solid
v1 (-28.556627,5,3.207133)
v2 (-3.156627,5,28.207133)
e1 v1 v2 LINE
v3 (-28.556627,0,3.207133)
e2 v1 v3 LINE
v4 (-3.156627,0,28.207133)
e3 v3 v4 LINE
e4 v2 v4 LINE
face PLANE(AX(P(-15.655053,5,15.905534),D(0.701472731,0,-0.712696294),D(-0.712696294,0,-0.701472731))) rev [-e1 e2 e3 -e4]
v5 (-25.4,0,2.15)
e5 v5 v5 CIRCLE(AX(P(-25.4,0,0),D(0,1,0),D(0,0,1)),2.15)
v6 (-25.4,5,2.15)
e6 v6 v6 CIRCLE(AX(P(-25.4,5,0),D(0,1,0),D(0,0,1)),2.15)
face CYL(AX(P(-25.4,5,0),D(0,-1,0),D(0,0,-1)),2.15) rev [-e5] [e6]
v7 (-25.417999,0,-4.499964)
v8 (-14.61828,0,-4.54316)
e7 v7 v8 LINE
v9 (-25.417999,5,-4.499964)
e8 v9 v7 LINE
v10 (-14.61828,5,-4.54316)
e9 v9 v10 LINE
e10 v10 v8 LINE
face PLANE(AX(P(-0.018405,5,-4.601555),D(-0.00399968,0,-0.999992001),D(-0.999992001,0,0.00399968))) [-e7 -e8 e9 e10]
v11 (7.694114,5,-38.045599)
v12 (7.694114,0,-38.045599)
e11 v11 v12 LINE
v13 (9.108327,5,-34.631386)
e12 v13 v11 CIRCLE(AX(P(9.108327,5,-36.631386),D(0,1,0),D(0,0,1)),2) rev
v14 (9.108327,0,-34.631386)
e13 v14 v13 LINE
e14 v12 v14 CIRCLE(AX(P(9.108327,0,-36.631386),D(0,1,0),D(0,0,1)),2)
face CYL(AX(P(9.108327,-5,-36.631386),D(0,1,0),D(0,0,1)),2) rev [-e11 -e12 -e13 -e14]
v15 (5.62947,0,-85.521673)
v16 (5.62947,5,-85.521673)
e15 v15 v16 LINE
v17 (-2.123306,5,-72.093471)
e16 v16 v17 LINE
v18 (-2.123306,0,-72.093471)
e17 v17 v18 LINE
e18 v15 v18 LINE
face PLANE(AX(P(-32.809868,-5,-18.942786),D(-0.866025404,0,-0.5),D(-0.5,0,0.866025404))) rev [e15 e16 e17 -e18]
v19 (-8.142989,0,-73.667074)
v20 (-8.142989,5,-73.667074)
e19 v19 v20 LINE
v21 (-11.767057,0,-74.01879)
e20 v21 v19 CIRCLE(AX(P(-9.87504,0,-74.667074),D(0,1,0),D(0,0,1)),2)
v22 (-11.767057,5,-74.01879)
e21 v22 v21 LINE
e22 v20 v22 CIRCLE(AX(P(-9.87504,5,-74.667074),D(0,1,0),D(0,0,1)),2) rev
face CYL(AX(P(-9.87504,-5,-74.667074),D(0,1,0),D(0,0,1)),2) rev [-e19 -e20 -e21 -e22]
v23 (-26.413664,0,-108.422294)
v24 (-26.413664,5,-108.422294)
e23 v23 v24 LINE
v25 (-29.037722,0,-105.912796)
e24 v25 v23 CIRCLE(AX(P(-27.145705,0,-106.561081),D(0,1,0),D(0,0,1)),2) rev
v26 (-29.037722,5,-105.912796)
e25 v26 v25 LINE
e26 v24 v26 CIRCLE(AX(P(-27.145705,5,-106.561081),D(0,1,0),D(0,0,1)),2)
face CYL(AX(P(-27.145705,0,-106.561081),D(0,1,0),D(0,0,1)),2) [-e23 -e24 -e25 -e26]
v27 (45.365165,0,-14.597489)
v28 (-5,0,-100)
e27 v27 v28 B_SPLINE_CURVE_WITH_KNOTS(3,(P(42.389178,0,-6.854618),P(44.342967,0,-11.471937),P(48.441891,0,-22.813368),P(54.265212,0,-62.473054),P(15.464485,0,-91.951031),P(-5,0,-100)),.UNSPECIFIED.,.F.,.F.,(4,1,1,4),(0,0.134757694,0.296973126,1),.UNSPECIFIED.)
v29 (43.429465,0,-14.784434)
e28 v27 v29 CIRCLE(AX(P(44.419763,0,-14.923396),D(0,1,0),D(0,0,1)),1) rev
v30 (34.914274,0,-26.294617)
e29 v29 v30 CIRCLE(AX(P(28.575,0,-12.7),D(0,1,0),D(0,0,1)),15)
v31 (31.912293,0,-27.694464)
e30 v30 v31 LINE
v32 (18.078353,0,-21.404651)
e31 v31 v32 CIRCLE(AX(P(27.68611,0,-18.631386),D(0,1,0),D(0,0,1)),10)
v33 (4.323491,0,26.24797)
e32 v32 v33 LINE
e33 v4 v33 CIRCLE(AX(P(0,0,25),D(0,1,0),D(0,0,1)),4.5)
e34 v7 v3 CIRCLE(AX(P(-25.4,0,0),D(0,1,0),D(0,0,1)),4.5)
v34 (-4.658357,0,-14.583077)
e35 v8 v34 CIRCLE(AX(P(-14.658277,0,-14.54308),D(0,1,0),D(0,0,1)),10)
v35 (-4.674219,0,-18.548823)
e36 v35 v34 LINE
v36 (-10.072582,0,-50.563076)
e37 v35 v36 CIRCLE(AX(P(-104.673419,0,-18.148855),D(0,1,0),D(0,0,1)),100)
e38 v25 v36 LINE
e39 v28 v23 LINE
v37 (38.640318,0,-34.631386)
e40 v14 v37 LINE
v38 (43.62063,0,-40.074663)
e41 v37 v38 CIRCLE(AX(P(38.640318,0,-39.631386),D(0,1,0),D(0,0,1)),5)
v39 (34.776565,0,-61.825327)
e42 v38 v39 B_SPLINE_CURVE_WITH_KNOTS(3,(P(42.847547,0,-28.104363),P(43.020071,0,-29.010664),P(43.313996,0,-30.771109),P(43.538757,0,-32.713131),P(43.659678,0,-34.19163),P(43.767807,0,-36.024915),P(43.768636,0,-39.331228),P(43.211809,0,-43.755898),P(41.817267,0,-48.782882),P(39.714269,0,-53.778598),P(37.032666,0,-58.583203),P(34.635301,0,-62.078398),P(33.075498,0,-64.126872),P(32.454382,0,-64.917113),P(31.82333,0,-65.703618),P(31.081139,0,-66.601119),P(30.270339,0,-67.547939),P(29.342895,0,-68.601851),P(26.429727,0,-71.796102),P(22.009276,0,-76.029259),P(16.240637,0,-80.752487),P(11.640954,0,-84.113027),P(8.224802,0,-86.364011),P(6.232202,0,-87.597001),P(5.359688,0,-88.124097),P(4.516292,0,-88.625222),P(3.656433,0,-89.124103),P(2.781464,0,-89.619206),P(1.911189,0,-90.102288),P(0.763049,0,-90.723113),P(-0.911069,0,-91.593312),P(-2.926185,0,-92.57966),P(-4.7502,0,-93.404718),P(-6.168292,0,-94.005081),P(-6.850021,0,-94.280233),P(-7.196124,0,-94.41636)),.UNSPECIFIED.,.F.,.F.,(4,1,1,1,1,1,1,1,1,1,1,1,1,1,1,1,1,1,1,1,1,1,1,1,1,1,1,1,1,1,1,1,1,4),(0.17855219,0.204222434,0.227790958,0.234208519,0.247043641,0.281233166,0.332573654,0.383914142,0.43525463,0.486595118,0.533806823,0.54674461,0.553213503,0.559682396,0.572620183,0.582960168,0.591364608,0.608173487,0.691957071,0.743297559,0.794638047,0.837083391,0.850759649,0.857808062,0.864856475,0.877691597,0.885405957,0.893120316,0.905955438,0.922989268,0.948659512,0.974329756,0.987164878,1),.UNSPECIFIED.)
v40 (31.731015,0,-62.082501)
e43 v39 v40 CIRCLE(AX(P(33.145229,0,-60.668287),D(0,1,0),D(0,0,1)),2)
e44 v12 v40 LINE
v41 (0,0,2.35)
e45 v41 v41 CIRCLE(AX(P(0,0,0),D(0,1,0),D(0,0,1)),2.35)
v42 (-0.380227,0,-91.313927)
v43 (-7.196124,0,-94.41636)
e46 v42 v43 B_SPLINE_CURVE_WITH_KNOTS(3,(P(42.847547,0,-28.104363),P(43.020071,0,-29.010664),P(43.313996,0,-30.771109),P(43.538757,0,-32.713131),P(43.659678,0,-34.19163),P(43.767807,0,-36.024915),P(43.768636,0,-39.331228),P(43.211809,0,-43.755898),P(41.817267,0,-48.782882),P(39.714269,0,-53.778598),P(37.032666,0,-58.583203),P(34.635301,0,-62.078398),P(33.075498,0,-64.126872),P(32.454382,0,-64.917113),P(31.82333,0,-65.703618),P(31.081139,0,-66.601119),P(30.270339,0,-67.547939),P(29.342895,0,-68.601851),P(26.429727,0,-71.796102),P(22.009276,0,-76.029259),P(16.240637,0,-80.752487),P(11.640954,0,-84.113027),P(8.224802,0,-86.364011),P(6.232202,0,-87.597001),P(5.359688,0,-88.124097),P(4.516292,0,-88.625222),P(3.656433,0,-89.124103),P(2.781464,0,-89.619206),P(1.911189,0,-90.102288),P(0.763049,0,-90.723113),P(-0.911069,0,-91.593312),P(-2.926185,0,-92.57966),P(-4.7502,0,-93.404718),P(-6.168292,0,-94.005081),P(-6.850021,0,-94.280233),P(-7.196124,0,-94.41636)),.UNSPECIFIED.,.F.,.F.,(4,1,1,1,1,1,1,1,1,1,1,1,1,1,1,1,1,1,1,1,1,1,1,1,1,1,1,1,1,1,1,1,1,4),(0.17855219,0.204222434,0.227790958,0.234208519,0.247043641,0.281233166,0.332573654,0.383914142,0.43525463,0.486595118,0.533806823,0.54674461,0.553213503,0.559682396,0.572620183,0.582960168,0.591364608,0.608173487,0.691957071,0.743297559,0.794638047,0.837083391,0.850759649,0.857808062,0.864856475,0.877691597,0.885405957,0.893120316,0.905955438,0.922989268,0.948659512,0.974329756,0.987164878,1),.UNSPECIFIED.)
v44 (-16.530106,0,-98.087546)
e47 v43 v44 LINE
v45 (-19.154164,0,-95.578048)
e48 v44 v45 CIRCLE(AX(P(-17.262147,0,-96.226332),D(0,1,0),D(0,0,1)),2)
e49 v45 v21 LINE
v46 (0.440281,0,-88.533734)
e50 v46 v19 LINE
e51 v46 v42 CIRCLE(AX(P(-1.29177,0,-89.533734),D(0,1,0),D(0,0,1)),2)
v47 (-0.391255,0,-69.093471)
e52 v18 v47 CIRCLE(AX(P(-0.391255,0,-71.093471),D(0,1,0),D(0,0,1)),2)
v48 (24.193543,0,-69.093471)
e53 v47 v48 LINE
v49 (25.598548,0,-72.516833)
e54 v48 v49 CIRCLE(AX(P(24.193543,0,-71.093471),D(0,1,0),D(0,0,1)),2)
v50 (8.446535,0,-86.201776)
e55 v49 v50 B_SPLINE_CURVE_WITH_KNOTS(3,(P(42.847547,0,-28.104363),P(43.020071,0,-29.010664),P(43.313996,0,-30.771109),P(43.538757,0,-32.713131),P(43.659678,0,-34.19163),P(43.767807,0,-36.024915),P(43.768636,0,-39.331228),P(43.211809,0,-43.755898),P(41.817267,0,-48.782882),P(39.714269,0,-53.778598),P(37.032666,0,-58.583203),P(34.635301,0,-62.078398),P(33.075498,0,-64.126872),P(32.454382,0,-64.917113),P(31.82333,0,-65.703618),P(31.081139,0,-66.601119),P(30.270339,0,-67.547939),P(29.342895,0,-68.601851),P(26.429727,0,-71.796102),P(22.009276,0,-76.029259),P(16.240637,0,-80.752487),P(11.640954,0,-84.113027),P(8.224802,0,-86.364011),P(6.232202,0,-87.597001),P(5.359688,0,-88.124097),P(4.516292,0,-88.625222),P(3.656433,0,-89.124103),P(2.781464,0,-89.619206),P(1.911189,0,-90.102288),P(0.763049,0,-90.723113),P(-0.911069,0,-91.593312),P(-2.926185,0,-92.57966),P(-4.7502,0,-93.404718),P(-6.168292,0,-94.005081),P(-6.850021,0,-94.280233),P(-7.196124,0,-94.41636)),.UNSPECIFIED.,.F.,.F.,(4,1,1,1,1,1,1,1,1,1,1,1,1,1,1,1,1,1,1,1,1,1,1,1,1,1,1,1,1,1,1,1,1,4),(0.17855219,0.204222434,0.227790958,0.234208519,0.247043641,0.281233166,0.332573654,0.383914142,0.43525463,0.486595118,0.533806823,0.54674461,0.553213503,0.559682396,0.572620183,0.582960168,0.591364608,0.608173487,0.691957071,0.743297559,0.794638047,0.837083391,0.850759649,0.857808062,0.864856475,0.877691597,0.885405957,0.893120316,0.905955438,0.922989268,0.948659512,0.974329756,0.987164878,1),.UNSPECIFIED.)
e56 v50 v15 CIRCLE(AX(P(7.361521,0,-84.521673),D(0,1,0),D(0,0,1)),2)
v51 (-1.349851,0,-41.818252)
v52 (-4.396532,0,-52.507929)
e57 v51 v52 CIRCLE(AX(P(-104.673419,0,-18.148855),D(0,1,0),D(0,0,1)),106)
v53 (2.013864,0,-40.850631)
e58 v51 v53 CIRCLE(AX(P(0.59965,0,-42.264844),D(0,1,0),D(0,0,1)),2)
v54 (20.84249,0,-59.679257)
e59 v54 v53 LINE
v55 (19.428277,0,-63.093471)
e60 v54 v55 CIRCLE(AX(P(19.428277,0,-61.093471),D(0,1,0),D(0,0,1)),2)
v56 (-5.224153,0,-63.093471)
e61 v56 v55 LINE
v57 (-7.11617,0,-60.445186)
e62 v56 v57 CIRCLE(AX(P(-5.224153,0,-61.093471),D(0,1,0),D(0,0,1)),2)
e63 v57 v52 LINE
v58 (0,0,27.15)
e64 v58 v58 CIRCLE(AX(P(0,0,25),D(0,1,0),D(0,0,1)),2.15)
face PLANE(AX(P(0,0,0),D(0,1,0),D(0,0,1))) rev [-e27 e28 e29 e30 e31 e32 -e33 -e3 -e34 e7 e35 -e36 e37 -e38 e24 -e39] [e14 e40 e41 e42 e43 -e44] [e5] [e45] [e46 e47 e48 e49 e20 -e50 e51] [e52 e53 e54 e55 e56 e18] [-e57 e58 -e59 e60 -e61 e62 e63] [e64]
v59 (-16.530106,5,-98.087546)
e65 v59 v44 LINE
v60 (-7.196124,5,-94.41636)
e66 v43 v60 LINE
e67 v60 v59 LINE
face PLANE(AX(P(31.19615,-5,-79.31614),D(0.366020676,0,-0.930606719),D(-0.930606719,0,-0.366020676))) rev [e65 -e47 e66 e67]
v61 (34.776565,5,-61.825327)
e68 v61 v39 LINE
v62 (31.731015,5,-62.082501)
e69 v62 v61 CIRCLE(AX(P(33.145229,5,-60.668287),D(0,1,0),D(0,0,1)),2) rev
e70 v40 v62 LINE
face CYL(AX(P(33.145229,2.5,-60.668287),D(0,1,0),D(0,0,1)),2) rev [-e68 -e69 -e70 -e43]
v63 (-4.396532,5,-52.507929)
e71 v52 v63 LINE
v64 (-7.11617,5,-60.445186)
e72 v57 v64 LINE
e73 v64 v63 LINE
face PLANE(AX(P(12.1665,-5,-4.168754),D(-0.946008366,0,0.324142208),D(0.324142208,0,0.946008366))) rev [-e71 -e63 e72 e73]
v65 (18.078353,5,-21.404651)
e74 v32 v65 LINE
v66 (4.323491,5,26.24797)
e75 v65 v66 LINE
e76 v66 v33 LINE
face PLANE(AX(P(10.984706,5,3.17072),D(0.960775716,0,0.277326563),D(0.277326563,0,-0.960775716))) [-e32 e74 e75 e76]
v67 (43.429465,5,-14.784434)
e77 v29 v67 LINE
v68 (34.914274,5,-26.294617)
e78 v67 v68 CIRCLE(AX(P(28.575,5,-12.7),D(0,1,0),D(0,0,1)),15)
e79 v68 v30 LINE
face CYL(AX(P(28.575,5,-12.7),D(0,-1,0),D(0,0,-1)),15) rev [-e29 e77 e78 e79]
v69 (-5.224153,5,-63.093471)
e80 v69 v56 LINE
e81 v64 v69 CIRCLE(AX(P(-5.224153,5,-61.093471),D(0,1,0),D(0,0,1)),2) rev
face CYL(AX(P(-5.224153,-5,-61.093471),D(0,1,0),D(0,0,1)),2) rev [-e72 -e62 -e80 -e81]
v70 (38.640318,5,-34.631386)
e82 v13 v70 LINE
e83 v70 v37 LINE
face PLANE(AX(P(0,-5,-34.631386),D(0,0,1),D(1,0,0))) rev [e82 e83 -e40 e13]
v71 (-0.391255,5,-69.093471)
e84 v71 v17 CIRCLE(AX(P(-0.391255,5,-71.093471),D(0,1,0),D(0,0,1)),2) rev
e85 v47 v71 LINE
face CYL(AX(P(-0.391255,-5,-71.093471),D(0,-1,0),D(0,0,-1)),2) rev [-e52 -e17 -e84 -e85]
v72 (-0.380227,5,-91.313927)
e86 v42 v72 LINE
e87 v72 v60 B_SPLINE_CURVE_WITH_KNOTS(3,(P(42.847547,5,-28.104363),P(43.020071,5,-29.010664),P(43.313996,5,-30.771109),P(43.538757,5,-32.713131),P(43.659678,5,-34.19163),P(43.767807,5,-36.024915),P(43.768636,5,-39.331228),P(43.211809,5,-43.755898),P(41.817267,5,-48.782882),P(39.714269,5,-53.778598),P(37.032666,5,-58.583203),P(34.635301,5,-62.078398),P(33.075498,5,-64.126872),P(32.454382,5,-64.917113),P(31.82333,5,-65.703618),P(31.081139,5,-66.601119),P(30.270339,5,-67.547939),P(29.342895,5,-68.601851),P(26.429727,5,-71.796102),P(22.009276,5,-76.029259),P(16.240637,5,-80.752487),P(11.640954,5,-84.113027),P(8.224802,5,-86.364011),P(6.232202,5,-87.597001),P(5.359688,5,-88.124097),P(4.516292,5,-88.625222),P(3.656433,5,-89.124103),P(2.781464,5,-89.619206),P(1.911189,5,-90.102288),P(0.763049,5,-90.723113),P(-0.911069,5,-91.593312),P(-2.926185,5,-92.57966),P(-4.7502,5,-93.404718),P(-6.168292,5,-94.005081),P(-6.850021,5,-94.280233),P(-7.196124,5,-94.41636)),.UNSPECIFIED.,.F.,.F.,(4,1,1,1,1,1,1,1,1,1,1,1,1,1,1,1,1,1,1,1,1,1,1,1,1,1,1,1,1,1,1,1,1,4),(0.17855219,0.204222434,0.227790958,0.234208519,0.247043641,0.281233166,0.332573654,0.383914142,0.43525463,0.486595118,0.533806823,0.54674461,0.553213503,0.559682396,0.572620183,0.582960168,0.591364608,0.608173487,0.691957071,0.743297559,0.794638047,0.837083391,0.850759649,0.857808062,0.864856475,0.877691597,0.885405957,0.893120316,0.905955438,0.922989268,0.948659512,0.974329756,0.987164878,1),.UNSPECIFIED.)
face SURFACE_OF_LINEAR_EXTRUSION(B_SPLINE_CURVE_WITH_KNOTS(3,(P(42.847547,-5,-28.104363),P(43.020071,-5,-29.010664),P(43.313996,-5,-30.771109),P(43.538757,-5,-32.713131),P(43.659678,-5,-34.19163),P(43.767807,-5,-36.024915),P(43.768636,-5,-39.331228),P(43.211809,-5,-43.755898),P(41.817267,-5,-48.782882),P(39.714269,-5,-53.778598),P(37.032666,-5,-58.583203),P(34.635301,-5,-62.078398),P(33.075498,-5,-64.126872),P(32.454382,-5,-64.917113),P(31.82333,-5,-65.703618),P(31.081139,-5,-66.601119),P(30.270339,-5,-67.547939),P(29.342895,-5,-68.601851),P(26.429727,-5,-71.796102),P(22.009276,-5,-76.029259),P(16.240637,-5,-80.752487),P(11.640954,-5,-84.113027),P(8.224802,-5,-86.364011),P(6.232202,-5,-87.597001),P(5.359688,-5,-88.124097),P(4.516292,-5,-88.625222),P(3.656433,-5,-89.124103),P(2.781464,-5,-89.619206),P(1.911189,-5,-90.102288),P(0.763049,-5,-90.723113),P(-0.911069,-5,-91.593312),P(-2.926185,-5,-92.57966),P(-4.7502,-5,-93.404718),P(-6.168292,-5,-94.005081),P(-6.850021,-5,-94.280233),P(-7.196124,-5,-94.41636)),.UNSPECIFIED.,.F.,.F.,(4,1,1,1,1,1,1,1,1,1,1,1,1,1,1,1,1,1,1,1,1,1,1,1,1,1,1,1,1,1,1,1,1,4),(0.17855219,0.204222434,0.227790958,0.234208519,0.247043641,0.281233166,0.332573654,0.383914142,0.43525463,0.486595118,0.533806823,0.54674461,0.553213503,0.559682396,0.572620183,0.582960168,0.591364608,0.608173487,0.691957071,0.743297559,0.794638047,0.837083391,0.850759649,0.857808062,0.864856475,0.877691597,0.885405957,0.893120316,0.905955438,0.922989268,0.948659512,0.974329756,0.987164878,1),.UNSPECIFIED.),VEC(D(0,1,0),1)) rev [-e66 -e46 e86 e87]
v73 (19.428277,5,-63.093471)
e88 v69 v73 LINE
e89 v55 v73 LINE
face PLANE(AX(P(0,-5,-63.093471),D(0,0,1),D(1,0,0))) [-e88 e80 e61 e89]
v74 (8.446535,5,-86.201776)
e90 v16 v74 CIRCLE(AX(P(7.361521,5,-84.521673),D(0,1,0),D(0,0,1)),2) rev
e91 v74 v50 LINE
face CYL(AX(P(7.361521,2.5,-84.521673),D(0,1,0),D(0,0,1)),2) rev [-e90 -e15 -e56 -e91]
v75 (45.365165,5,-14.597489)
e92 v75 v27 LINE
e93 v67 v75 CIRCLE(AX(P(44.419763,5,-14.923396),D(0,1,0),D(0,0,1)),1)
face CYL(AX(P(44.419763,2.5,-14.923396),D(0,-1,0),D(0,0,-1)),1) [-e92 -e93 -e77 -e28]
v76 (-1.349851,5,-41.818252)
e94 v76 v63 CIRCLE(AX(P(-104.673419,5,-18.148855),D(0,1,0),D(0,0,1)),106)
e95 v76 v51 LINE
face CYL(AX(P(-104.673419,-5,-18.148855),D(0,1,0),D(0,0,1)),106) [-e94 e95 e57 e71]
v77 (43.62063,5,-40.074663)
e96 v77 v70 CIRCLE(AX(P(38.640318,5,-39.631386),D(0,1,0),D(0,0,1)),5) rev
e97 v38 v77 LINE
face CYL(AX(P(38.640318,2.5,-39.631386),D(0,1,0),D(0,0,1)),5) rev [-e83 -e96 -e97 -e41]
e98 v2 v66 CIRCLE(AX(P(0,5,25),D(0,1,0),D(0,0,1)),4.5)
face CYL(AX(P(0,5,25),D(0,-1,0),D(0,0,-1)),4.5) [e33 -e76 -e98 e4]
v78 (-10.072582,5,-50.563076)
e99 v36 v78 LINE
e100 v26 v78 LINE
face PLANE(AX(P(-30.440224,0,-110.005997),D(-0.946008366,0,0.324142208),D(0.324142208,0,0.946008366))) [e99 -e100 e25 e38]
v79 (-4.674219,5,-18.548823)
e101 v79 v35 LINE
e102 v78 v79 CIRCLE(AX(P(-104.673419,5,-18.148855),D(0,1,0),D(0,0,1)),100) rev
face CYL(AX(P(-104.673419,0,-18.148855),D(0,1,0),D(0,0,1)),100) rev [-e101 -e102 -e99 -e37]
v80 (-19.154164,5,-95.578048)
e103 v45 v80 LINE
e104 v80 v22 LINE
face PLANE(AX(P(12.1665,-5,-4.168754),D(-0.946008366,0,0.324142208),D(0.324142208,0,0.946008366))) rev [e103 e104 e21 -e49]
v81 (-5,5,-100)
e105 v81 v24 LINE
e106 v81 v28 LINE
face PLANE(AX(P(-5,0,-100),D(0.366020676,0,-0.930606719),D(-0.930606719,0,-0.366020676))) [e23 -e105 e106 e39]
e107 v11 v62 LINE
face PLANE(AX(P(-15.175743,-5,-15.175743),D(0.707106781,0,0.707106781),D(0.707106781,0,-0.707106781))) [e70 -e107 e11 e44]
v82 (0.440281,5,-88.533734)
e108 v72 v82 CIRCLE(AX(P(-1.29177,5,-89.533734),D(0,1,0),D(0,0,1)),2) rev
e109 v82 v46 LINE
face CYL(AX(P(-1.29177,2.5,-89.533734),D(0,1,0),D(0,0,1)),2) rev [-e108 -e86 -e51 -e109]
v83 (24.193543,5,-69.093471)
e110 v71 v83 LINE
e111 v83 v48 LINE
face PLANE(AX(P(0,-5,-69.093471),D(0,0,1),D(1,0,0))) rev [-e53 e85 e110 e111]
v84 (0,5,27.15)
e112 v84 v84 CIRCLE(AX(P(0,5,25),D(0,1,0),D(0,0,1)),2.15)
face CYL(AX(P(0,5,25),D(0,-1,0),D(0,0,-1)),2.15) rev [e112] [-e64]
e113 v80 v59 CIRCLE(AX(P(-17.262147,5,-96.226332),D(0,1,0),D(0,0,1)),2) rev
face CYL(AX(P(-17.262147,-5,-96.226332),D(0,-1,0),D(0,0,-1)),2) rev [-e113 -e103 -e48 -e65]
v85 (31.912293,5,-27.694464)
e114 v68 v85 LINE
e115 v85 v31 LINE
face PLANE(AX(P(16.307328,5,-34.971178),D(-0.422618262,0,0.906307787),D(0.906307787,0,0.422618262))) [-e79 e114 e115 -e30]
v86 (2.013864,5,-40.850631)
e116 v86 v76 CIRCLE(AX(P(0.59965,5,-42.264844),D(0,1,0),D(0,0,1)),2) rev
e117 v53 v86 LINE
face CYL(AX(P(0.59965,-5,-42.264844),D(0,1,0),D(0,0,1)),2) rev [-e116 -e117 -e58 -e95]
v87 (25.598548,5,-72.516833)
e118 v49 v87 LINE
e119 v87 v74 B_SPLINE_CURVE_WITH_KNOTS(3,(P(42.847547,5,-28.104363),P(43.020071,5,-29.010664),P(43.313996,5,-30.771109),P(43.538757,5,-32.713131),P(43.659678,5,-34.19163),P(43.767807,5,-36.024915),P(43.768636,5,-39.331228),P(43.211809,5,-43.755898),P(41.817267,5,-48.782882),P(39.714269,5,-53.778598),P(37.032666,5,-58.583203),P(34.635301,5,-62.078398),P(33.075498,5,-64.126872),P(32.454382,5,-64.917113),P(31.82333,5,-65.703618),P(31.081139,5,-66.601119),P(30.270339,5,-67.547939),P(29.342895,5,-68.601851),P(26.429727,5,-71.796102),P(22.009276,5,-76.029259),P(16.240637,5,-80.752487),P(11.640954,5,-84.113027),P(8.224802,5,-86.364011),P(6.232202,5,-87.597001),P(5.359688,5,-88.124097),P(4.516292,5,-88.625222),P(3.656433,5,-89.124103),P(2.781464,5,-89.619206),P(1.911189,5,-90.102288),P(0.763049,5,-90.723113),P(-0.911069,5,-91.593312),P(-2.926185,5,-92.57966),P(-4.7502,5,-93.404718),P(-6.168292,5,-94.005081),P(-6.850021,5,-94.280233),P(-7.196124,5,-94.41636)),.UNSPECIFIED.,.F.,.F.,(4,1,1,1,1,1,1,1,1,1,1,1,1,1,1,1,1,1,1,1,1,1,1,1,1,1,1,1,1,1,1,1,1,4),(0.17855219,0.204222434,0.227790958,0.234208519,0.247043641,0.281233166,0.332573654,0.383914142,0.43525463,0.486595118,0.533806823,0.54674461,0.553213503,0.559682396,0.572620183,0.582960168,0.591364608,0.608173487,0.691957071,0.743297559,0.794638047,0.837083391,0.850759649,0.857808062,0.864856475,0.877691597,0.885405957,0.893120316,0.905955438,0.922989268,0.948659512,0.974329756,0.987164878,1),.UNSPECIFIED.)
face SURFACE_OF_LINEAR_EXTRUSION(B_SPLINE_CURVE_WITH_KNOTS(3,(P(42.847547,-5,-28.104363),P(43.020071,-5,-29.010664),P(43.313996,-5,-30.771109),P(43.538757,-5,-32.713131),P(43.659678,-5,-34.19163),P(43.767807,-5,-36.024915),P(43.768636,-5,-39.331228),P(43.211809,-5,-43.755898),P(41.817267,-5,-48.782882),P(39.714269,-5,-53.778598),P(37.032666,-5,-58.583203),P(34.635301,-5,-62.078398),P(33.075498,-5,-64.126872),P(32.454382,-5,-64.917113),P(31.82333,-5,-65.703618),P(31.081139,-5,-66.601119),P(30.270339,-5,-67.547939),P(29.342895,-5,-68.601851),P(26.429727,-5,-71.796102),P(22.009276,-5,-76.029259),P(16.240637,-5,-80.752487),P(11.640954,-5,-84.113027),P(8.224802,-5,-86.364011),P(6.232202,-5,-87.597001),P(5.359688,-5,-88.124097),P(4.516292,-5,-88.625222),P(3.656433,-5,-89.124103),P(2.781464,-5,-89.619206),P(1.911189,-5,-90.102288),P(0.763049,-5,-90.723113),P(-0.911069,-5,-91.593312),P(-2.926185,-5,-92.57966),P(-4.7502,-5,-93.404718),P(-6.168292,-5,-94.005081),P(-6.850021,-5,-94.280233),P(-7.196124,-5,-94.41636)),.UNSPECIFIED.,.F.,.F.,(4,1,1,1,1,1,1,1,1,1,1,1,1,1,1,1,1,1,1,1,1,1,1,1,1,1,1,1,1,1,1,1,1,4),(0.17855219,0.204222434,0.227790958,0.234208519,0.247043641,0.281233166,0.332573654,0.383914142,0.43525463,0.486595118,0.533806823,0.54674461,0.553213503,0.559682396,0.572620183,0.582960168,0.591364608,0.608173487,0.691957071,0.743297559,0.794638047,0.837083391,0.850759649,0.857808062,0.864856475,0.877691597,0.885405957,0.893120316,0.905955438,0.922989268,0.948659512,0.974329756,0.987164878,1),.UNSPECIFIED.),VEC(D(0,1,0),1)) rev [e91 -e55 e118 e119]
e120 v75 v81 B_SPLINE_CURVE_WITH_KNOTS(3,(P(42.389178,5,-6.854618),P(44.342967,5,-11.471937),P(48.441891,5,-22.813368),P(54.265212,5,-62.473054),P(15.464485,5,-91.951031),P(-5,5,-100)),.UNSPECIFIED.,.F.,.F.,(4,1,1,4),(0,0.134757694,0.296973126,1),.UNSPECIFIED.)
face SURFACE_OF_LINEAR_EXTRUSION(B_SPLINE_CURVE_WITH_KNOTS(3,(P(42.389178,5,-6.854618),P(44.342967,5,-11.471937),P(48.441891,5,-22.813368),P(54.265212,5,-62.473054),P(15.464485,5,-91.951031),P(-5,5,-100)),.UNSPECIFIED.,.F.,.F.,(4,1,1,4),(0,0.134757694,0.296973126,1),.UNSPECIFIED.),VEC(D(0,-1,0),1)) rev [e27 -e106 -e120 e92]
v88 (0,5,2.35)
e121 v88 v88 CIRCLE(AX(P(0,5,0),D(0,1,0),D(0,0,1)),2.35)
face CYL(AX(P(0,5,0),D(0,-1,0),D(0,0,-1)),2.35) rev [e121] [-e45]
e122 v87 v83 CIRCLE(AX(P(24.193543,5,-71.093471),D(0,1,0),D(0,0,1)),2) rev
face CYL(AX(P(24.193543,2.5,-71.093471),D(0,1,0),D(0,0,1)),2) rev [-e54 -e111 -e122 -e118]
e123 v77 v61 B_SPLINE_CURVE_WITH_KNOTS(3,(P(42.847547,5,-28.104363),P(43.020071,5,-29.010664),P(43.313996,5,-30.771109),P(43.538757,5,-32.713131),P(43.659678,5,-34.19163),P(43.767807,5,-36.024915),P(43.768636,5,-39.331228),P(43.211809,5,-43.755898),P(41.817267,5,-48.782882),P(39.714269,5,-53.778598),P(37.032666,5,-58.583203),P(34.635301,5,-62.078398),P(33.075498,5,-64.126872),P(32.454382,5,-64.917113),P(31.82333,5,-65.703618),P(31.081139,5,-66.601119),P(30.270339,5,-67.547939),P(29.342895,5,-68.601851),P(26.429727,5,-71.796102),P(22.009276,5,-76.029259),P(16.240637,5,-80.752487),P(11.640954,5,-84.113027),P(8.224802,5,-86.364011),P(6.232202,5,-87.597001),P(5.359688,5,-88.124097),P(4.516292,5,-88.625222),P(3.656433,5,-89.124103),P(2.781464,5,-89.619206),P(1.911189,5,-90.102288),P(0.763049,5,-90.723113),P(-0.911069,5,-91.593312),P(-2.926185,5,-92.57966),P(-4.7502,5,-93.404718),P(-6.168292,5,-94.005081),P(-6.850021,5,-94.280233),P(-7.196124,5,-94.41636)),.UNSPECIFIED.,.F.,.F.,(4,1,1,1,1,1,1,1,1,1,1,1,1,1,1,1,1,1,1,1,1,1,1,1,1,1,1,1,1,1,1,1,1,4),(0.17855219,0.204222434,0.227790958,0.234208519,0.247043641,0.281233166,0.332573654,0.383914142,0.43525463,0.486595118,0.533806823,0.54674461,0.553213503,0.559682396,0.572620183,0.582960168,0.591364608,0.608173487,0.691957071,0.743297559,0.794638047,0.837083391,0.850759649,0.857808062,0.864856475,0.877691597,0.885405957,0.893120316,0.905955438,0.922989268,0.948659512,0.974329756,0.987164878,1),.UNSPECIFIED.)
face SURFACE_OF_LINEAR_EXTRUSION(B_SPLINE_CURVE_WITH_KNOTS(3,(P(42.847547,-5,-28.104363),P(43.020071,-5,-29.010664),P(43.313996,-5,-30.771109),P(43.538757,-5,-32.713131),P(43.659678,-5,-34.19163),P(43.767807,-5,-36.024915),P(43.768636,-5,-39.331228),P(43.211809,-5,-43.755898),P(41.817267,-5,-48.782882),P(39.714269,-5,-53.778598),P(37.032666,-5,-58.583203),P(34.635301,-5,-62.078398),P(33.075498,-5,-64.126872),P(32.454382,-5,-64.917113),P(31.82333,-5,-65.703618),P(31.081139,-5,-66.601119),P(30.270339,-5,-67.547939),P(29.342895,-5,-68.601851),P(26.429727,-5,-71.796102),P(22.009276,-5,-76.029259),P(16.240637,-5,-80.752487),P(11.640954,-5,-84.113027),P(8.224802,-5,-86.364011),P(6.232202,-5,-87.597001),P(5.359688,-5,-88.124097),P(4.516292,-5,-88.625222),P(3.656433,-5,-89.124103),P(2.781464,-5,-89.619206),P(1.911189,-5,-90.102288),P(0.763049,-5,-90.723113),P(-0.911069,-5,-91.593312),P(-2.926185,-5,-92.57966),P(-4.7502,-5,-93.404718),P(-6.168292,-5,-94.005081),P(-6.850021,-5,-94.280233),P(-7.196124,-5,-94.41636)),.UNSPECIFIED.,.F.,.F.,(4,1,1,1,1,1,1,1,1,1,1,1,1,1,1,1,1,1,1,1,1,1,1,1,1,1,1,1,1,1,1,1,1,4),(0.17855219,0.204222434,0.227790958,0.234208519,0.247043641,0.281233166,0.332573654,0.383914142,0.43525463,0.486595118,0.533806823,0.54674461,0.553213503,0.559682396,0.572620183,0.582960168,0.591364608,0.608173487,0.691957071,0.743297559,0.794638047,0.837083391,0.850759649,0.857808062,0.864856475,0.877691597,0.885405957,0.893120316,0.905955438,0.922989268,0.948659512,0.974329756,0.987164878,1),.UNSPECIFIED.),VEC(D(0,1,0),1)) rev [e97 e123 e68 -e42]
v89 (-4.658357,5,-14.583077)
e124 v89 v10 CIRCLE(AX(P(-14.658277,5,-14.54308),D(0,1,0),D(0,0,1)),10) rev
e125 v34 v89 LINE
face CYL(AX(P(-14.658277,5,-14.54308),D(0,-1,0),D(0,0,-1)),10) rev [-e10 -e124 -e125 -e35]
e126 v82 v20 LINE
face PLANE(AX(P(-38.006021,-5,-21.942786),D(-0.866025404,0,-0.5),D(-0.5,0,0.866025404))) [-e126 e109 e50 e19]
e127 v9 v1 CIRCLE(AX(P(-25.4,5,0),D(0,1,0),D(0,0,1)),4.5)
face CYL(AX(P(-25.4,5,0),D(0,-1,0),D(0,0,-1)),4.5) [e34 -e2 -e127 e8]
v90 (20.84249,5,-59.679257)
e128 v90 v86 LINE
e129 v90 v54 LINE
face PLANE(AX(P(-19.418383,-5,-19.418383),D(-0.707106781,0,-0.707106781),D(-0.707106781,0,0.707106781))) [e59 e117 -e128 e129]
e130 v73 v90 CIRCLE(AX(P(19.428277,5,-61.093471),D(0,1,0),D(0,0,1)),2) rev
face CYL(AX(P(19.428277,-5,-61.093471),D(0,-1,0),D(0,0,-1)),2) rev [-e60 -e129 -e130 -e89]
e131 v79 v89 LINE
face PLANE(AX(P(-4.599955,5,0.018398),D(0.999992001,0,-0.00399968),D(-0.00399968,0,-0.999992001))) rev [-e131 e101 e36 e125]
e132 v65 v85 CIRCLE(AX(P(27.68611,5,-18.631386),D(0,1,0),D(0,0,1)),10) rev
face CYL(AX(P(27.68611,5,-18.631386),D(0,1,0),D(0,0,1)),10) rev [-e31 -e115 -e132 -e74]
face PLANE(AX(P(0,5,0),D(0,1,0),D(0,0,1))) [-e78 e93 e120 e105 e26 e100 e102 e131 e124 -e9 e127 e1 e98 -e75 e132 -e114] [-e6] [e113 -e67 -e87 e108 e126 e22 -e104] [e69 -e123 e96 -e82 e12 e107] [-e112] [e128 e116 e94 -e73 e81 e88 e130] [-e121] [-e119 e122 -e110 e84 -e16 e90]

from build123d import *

# Parameters (mm, degrees)
SKETCH1_R           = 2.35
SKETCH1_R_2         = 2.15
BOSS_EXTRUDE1_DEPTH = 5
BOSS_EXTRUDE2_DEPTH = 5
FILLET9_START       = -1
FILLET9_DEPTH       = 7
FILLET10_R          = 10
FILLET11_R          = 10
FILLET12_R          = 2
FILLET13_R          = 100
CUT_EXTRUDE1_DEPTH  = 10
FILLET16_R          = 2
FILLET17_R          = 5


with BuildPart() as part:
    # Sketch1 → Boss-Extrude1 (new body)
    # profile 1 of 5: a face of its own
    with BuildSketch(Plane(origin=(0, 0, 0), x_dir=(1, 0, 0), z_dir=(0, 1, 0))):
        with BuildLine():
            Line((21.319657121, 32.633890732), (34.914273926, 26.294616806))
            ThreePointArc((34.914273926, 26.294616806), (41.225871687, 20.759494125), (43.575, 12.7))
            ThreePointArc((43.575, 12.7), (43.275555611, 9.717775204), (42.389178035, 6.854618472))
            add(Edge.make_bspline(
                [(42.389178035, 6.854618472), (44.342966782, 11.471936513), (48.441890724, 22.813367807), (54.26521217, 62.473053577), (15.464484864, 91.951031047), (-5, 100)],
                knots=[0, 0, 0, 0, 0.134757694, 0.296973126, 1, 1, 1, 1], degree=3))
            Line((-5, 100), (-4.618360102, 4.58315657))
            Line((-4.618360102, 4.58315657), (-4.499964006, -25.01799856))
            ThreePointArc((-4.499964006, -25.01799856), (-0.008999298, -20.500008999), (4.5, -25))
            ThreePointArc((4.5, -25), (4.455654175, -25.630195106), (4.323490724, -26.247969535))
            Line((4.323490724, -26.247969535), (14.266400512, 8.198446858))
            ThreePointArc((14.266400512, 8.198446858), (14.163364253, 16.859898449), (18.866215247, 24.134137424))
            Line((18.866215247, 24.134137424), (21.319657121, 32.633890732))
        make_face()
        with Locations(Location((0, 0, 0), (0, 0, 270))):
            Circle(SKETCH1_R, mode=Mode.SUBTRACT)
    # profile 2 of 5: a face of its own
    with BuildSketch(Plane(origin=(0, 0, 0), x_dir=(1, 0, 0), z_dir=(0, 1, 0))):
        with BuildLine():
            Line((14.266400512, 8.198446858), (18.866215247, 24.134137424))
            ThreePointArc((18.866215247, 24.134137424), (14.163364253, 16.859898449), (14.266400512, 8.198446858))
        make_face()
    # profile 3 of 5: a face of its own
    with BuildSketch(Plane(origin=(0, 0, 0), x_dir=(1, 0, 0), z_dir=(0, 1, 0))):
        with BuildLine():
            ThreePointArc((-3.156627288, -28.207133325), (1.140163698, -29.353162843), (4.323490724, -26.247969535))
            ThreePointArc((4.323490724, -26.247969535), (4.455654175, -25.630195106), (4.5, -25))
            ThreePointArc((4.5, -25), (-0.008999298, -20.500008999), (-4.499964006, -25.01799856))
            ThreePointArc((-4.499964006, -25.01799856), (-4.147106545, -26.746856406), (-3.156627288, -28.207133325))
        make_face()
        with Locations(Location((0, -25, 0), (0, 0, 270))):
            Circle(SKETCH1_R_2, mode=Mode.SUBTRACT)
    # profile 4 of 5: a face of its own
    with BuildSketch(Plane(origin=(0, 0, 0), x_dir=(1, 0, 0), z_dir=(0, 1, 0))):
        with BuildLine():
            Line((-4.499964006, -25.01799856), (-4.618360102, 4.58315657))
            Line((-4.618360102, 4.58315657), (-25.41799856, 4.499964006))
            ThreePointArc((-25.41799856, 4.499964006), (-22.224389312, 3.188337617), (-20.9, 0))
            ThreePointArc((-20.9, 0), (-23.661440653, -4.150591693), (-28.556627288, -3.207133325))
            Line((-28.556627288, -3.207133325), (-3.156627288, -28.207133325))
            ThreePointArc((-3.156627288, -28.207133325), (-4.147106545, -26.746856406), (-4.499964006, -25.01799856))
        make_face()
    # profile 5 of 5: a face of its own
    with BuildSketch(Plane(origin=(0, 0, 0), x_dir=(1, 0, 0), z_dir=(0, 1, 0))):
        with BuildLine():
            ThreePointArc((-20.9, 0), (-22.224389312, 3.188337617), (-25.41799856, 4.499964006))
            ThreePointArc((-25.41799856, 4.499964006), (-29.567661171, 1.69723315), (-28.556627288, -3.207133325))
            ThreePointArc((-28.556627288, -3.207133325), (-23.661440653, -4.150591693), (-20.9, 0))
        make_face()
        with Locations(Location((-25.4, 0, 0), (0, 0, 270))):
            Circle(SKETCH1_R_2, mode=Mode.SUBTRACT)
    extrude(amount=BOSS_EXTRUDE1_DEPTH)

    # Sketch2 → Boss-Extrude2 (add, through all)
    with BuildSketch(Plane(origin=(0, 5, 0), x_dir=(1, 0, 0), z_dir=(0, 1, 0))):
        Polygon((-5, 100), (-30.440224277, 110.005997059), (-4.740018717, 35), align=None)
    extrude(amount=-BOSS_EXTRUDE2_DEPTH)

    # Fillet9: read off the stored shape, not the designer's step
    # Fillet9 outline → Fillet9 (cut)
    with BuildSketch(Plane(origin=(0, 0, 0), x_dir=(1, 0, 0), z_dir=(0, 1, 0)).offset(FILLET9_START)):
        with BuildLine():
            add(Edge.make_bspline(
                [(42.389178035, 6.854618472), (43.427373548, 9.308148252), (44.439078816, 11.911072083), (45.365164545, 14.597488782)],
                knots=[0, 0, 0, 0, 0.07160694, 0.07160694, 0.07160694, 0.07160694], degree=3))
            ThreePointArc((45.365164545, 14.597488782), (44.323632558, 13.928027401), (43.429465164, 14.784433901))
            ThreePointArc((43.429465164, 14.784433901), (43.447567664, 10.748915407), (42.389178035, 6.854618472))
        make_face()
    extrude(amount=FILLET9_DEPTH, mode=Mode.SUBTRACT)

    # Fillet10
    fillet10_edges = [part.edges().sort_by_distance(p)[0] for p in [
        (21.319657121, 2.5, -32.633890732),
    ]]
    fillet(fillet10_edges, radius=FILLET10_R)

    # Fillet11
    fillet11_edges = [part.edges().sort_by_distance(p)[0] for p in [
        (-4.618360102, 2.5, -4.58315657),
    ]]
    fillet(fillet11_edges, radius=FILLET11_R)

    # Fillet12
    fillet12_edges = [part.edges().sort_by_distance(p)[0] for p in [
        (-30.440224277, 2.5, -110.005997059),
    ]]
    fillet(fillet12_edges, radius=FILLET12_R)

    # Fillet13
    fillet13_edges = [part.edges().sort_by_distance(p)[0] for p in [
        (-4.740018717, 2.5, -35),
    ]]
    fillet(fillet13_edges, radius=FILLET13_R)

    # Sketch3 → Cut-Extrude1 (cut)
    with BuildSketch(Plane(origin=(0, 5, 0), x_dir=(1, 0, 0), z_dir=(0, 1, 0))):
        with BuildLine():
            Line((-7.196124056, 94.416359688), (-20.556666638, 99.671248494))
            Line((-20.556666638, 99.671248494), (-10.34167973, 69.858830216))
            Line((-10.34167973, 69.858830216), (1.479992408, 90.33456699))
            add(Edge.make_bspline(
                [(1.479992408, 90.33456699), (1.28397872, 90.440564461), (0.569604437, 90.823664357), (-0.911069003, 91.59331249), (-2.926185163, 92.579659505), (-4.750200244, 93.404717974), (-6.168292078, 94.005080785), (-6.85002115, 94.280232561), (-7.196124056, 94.416359688)],
                knots=[0.899537877, 0.899537877, 0.899537877, 0.899537877, 0.905955438, 0.922989268, 0.948659512, 0.974329756, 0.987164878, 1, 1, 1, 1], degree=3))
        make_face()
        with BuildLine():
            add(Edge.make_bspline(
                [(28.891913577, 69.093470772), (28.667354165, 69.339735814), (26.185201557, 72.030266697), (22.009276054, 76.029258723), (16.240637184, 80.752486943), (11.640954059, 84.113026779), (8.44218135, 86.220773941), (6.886134042, 87.191294266), (6.670477462, 87.324750819)],
                knots=[0.599769047, 0.599769047, 0.599769047, 0.599769047, 0.608173487, 0.691957071, 0.743297559, 0.794638047, 0.837083391, 0.84392152, 0.84392152, 0.84392152, 0.84392152], degree=3))
            Line((6.670477462, 87.324750819), (-3.855356981, 69.093470772))
            Line((-3.855356981, 69.093470772), (28.891913577, 69.093470772))
        make_face()
        with BuildLine():
            Line((24.256703875, 63.093470772), (-8.023583375, 63.093470772))
            Line((-8.023583375, 63.093470772), (-4.396532038, 52.507928907))
            ThreePointArc((-4.396532038, 52.507928907), (-2.247165573, 45.44102658), (-0.595170682, 38.241596216))
            Line((-0.595170682, 38.241596216), (24.256703875, 63.093470772))
        make_face()
        with BuildLine():
            add(Edge.make_bspline(
                [(43.683908276, 34.631385763), (43.696866831, 34.851470147), (43.767861036, 36.240626578), (43.768636498, 39.331228462), (43.211809078, 43.755898325), (41.817266975, 48.782881707), (39.714268813, 53.778597693), (37.032666408, 58.583202787), (34.774401672, 61.875598877), (33.528556835, 63.529710734), (33.377122853, 63.728608376)],
                knots=[0.24062608, 0.24062608, 0.24062608, 0.24062608, 0.247043641, 0.281233166, 0.332573654, 0.383914142, 0.43525463, 0.486595118, 0.533806823, 0.540275717, 0.540275717, 0.540275717, 0.540275717], degree=3))
            Line((33.377122853, 63.728608376), (4.279900241, 34.631385764))
            Line((4.279900241, 34.631385764), (27.686110097, 34.631385764))
            Line((27.686110097, 34.631385764), (43.683908276, 34.631385763))
        make_face()
    extrude(amount=-CUT_EXTRUDE1_DEPTH, mode=Mode.SUBTRACT)

    # Fillet16
    fillet16_edges = [part.edges().sort_by_distance(p)[0] for p in [
        (33.377122853, 2.5, -63.728608376),
        (-20.556666638, 2.5, -99.671248494),
        (-10.34167973, 2.5, -69.858830216),
        (1.479992408, 2.5, -90.33456699),
        (6.670477462, 2.5, -87.324750819),
        (-3.855356981, 2.5, -69.093470772),
        (28.891913577, 2.5, -69.093470772),
        (-8.023583375, 2.5, -63.093470772),
        (-0.595170682, 2.5, -38.241596216),
        (24.256703875, 2.5, -63.093470772),
        (4.279900241, 2.5, -34.631385764),
    ]]
    fillet(fillet16_edges, radius=FILLET16_R)

    # Fillet17
    fillet17_edges = [part.edges().sort_by_distance(p)[0] for p in [
        (43.683908276, 2.5, -34.631385763),
    ]]
    fillet(fillet17_edges, radius=FILLET17_R)


solid = part.part
